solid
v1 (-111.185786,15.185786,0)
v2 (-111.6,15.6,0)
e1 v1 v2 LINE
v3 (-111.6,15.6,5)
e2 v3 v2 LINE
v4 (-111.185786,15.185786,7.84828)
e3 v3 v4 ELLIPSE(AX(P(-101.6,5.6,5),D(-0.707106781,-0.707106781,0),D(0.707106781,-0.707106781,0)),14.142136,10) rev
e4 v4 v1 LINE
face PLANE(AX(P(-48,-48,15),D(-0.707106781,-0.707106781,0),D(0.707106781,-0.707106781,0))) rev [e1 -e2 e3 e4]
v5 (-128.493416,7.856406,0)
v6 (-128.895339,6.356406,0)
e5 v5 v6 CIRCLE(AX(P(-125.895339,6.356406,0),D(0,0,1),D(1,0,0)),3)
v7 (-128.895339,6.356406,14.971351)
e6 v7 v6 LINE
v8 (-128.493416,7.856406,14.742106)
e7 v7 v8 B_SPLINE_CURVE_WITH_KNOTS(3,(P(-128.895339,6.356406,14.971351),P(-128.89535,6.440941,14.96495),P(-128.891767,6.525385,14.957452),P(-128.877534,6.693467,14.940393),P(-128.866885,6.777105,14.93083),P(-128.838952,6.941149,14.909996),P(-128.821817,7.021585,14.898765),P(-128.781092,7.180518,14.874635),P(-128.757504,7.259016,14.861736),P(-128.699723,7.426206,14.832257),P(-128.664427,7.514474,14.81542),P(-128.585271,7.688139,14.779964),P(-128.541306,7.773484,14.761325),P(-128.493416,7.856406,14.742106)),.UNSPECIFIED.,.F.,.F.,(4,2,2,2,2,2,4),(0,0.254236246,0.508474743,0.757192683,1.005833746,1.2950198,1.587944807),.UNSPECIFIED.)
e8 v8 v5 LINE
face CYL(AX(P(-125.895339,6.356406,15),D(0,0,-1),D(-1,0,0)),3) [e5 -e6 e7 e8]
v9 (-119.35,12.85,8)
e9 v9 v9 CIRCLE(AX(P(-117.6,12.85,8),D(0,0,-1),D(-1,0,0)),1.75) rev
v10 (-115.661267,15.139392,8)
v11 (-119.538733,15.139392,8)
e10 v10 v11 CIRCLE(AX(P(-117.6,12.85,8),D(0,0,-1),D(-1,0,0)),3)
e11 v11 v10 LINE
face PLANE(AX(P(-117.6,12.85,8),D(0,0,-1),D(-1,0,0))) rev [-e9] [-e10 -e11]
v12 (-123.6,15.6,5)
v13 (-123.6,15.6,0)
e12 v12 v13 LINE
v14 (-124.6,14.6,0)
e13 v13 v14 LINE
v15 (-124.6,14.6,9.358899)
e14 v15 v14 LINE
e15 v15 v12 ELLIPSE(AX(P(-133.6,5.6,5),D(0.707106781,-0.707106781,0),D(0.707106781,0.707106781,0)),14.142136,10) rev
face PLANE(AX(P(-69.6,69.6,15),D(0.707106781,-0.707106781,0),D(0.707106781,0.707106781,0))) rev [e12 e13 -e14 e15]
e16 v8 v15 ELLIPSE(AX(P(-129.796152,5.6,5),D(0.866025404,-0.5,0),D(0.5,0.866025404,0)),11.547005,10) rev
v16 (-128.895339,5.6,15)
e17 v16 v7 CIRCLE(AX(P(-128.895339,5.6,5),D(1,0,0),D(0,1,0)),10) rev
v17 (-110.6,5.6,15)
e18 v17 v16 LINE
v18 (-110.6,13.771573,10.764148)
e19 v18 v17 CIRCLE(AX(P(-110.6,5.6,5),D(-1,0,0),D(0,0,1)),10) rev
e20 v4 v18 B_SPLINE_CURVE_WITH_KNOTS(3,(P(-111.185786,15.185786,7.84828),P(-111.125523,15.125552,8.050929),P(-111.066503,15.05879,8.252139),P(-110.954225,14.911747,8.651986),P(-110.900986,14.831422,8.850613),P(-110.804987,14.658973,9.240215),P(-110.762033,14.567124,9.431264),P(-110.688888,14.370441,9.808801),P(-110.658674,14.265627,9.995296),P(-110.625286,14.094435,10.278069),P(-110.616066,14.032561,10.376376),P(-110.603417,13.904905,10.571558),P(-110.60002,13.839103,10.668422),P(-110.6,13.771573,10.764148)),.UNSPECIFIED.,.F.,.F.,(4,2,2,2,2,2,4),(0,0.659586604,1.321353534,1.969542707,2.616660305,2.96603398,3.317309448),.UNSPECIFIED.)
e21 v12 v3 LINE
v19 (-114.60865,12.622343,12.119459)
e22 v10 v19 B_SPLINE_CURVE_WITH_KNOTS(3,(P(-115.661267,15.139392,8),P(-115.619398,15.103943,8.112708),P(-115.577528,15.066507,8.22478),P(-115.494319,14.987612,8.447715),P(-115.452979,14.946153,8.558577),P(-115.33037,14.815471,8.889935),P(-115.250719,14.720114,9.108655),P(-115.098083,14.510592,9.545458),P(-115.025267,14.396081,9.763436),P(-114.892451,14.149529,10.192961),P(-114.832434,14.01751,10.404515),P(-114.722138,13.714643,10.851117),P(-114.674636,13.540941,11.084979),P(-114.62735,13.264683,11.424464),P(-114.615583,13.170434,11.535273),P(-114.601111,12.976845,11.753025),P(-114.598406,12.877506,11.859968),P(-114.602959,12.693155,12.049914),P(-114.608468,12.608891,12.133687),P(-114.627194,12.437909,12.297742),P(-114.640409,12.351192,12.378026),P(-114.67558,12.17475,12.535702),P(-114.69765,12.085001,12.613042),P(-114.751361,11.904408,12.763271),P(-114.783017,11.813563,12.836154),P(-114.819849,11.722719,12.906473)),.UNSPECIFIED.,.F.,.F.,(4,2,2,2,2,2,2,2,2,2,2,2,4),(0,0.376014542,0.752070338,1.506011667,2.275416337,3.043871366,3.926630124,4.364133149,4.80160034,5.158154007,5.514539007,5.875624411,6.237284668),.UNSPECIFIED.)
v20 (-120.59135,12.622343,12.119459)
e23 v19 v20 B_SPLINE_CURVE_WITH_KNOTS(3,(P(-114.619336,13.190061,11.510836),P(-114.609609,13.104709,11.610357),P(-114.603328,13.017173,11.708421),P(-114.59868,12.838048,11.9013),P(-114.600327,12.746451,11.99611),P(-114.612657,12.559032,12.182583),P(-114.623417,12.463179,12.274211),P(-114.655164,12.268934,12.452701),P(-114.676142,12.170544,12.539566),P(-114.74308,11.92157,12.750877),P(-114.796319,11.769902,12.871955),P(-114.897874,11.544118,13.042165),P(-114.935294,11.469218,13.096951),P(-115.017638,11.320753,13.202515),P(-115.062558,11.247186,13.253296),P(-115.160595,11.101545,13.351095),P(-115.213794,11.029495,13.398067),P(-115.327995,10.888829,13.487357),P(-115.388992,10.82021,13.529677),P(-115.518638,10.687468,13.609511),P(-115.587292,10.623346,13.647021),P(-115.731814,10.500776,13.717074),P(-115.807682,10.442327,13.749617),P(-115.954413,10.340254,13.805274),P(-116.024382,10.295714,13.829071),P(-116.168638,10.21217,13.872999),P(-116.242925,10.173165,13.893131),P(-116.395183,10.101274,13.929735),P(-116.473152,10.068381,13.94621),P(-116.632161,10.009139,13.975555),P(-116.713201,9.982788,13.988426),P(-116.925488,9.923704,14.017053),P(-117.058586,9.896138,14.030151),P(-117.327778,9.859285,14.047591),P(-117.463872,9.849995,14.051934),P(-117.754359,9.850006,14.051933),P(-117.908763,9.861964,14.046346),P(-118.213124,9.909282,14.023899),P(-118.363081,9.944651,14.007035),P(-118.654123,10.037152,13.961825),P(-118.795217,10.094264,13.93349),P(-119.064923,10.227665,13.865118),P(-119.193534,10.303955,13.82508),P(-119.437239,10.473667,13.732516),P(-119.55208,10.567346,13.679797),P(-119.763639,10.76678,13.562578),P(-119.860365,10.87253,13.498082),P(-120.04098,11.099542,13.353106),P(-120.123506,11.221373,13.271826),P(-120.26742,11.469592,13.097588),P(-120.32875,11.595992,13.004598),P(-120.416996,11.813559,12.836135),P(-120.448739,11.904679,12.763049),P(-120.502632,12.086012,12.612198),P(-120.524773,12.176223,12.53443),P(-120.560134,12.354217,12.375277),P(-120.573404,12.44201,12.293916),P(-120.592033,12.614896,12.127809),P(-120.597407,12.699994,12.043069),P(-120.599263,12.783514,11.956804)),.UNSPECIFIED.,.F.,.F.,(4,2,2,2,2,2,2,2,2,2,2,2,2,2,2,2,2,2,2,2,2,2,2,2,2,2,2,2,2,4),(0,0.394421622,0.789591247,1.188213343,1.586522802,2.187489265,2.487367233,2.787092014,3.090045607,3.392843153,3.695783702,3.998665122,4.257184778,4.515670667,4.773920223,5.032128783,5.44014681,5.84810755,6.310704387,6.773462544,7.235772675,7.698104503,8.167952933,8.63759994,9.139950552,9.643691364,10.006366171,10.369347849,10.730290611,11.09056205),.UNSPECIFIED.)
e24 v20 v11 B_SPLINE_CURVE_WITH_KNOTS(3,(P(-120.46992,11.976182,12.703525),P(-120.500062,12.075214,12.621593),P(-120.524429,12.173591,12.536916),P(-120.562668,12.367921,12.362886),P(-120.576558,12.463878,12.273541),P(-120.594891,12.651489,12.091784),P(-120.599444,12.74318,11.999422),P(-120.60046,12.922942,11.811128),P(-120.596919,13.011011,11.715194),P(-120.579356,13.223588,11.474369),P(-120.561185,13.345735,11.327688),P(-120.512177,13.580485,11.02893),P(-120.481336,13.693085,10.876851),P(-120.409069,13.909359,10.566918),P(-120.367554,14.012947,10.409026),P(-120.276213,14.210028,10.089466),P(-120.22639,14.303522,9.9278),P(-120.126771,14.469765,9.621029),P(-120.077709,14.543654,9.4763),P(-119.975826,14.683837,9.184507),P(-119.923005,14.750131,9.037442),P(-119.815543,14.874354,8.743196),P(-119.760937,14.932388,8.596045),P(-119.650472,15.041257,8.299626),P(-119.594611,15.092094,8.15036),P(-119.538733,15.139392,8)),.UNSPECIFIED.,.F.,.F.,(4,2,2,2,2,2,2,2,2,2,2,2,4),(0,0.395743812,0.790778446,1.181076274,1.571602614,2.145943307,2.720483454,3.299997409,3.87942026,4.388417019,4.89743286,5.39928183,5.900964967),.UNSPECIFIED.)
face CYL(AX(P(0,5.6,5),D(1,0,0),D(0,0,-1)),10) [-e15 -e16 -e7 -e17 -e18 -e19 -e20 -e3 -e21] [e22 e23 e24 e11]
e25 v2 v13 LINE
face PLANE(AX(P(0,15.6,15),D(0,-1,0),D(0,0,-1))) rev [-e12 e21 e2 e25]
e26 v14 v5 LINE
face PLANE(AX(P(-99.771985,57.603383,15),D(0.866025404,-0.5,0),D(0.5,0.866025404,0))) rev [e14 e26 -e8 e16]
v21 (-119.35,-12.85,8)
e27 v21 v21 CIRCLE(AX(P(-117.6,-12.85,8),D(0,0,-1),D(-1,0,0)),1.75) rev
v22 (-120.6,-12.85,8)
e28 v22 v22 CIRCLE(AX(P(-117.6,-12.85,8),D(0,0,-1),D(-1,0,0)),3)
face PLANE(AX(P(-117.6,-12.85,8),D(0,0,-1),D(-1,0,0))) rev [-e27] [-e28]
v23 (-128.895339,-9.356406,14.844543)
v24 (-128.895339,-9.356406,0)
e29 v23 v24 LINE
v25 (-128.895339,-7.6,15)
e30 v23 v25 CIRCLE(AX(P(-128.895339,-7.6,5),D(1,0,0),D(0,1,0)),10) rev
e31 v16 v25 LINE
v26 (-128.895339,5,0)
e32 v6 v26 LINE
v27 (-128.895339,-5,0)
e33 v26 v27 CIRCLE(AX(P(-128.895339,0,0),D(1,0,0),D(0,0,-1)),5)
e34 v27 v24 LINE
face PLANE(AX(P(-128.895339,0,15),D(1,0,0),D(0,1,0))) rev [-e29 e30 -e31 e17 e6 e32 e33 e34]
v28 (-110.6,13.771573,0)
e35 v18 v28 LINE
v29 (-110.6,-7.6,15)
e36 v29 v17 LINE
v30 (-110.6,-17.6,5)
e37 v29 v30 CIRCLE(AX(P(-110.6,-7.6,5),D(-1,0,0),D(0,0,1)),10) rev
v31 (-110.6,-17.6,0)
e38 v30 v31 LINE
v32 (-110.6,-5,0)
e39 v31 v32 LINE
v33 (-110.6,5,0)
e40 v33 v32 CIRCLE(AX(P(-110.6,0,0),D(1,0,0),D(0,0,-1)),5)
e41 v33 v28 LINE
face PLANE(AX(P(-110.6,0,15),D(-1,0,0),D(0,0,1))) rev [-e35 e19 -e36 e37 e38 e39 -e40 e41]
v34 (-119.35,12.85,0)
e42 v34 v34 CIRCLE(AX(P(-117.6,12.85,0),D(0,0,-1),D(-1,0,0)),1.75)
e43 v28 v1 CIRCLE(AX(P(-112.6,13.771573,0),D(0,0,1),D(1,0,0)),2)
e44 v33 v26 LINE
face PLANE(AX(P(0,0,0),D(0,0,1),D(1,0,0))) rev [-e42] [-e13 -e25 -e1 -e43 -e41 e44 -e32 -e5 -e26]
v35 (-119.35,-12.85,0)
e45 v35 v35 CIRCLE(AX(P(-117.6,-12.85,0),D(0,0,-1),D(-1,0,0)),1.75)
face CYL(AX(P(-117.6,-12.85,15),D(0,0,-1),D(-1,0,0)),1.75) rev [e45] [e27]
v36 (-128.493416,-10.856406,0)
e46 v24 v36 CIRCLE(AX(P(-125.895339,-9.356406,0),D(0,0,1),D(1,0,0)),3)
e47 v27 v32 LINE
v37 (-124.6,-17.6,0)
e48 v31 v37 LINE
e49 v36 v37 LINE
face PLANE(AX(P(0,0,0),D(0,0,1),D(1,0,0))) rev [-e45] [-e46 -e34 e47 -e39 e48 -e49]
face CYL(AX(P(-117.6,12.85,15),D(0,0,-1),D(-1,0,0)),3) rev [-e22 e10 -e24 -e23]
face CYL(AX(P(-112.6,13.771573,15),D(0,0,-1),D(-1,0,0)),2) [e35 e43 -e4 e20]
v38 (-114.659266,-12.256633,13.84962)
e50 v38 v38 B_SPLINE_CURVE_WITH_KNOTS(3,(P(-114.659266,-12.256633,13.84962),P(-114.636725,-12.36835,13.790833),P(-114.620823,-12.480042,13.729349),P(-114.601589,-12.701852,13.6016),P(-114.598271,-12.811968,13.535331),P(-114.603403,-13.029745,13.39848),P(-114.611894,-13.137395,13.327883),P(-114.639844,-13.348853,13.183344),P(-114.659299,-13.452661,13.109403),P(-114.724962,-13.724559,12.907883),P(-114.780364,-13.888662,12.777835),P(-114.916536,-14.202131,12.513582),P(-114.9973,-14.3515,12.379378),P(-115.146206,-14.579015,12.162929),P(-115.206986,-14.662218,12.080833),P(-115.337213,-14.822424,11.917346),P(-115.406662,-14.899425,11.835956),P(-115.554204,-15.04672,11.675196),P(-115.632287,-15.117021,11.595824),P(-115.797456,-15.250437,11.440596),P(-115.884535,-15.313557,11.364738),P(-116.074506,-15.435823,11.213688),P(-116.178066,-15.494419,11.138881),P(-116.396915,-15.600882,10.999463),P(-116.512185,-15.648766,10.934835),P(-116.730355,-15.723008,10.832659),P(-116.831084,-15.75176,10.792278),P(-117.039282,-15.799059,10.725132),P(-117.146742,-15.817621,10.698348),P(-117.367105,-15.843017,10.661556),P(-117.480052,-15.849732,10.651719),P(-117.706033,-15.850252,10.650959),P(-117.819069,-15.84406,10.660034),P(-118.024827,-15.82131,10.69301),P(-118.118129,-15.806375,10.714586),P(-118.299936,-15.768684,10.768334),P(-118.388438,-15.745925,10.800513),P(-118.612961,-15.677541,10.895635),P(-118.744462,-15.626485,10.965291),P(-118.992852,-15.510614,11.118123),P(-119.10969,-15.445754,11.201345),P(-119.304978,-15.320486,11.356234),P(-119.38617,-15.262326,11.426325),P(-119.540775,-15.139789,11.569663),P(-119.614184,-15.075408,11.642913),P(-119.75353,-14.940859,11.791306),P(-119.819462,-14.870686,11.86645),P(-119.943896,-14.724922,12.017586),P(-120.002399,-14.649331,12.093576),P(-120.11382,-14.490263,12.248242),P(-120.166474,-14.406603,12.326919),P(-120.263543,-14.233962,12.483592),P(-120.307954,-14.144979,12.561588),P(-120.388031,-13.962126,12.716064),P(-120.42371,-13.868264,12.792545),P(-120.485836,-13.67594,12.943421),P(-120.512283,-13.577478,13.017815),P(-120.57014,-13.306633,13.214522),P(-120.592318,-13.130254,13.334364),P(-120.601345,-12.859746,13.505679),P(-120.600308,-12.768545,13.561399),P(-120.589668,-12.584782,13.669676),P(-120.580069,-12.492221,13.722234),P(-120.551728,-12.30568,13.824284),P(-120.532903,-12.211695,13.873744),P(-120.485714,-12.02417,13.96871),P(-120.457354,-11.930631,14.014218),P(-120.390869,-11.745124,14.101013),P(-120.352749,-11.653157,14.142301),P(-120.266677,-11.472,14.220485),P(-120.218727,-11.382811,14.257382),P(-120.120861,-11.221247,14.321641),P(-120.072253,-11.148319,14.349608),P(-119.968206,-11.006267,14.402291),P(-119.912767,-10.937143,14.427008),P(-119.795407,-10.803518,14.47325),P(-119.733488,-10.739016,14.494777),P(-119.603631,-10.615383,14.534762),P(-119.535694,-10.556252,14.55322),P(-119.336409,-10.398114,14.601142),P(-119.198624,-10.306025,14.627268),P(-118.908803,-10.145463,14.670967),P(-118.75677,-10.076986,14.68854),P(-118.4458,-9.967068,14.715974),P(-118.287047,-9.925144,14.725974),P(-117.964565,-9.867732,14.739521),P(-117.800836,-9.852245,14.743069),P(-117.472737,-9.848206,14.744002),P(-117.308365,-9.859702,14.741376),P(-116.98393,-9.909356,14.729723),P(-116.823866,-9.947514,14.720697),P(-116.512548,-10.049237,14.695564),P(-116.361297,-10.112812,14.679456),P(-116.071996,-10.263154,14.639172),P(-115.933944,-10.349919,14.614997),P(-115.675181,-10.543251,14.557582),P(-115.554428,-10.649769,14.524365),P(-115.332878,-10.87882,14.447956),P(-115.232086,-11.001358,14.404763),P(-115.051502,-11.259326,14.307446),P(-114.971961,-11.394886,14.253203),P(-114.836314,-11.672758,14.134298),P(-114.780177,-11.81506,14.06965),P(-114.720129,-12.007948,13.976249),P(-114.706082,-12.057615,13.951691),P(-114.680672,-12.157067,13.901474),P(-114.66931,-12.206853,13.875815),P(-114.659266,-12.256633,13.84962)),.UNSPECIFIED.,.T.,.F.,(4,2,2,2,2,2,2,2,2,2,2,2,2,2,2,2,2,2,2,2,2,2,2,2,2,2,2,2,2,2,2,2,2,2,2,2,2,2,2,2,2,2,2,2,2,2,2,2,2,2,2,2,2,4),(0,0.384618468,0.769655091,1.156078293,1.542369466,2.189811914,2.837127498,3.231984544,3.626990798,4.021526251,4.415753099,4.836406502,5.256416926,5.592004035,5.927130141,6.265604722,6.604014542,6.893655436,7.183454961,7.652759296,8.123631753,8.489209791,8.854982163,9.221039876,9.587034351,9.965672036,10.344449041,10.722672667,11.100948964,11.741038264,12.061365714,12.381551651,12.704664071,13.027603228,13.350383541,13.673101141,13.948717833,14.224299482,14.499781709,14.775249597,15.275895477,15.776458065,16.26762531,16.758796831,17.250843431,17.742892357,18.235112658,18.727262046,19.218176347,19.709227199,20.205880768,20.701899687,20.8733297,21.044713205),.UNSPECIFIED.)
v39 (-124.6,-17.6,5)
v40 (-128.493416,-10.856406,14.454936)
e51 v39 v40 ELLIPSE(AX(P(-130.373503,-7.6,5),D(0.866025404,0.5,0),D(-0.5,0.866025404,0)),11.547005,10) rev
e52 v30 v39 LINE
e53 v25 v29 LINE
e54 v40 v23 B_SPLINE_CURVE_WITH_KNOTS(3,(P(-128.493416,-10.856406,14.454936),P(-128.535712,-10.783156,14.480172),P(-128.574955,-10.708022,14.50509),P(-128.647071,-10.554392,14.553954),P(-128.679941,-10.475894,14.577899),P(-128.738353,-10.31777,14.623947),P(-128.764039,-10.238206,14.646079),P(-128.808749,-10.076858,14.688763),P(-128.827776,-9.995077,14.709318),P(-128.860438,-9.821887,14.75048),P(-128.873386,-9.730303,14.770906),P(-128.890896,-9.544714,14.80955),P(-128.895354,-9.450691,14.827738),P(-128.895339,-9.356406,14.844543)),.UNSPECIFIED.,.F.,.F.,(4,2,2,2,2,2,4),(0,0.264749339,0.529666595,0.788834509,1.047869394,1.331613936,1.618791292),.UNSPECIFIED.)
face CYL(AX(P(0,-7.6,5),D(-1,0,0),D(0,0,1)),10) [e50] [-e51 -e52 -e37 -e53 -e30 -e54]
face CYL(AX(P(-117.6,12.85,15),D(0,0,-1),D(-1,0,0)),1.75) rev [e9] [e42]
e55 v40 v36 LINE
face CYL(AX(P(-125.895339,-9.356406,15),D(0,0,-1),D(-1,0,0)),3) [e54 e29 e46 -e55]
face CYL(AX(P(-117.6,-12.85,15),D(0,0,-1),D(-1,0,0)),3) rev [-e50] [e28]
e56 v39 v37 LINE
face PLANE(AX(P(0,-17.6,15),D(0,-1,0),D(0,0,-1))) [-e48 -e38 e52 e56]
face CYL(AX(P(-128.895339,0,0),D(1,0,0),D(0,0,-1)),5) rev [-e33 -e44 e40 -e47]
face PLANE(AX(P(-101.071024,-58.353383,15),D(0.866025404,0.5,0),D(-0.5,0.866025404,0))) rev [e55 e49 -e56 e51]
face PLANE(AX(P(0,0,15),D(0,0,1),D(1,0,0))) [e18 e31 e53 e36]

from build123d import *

# Parameters (mm, degrees)
BOSS_EXTRUDE1_DEPTH = 15
SKETCH3_R           = 5
CUT_EXTRUDE1_DEPTH  = 30.486936791
SKETCH5_R           = 1.75
CUT_EXTRUDE3_DEPTH  = 131.953306572
CUT_EXTRUDE4_START  = -8
SKETCH6_R           = 3
CUT_EXTRUDE4_DEPTH  = 123.953306572
FILLET1_START       = -130
FILLET1_DEPTH       = 19.4


with BuildPart() as part:
    # Sketch1 → Boss-Extrude1 (new body)
    with BuildSketch(Plane.XY):
        with BuildLine():
            Line((-124.6, 14.6), (-128.493415545, 7.856406461))
            ThreePointArc((-128.493415545, 7.856406461), (-128.793116813, 7.132863596), (-128.895339334, 6.356406461))
            Line((-128.895339334, 6.356406461), (-128.895339334, -9.356406461))
            ThreePointArc((-128.895339334, -9.356406461), (-128.793116813, -10.132863596), (-128.493415545, -10.856406461))
            Line((-128.493415545, -10.856406461), (-124.6, -17.6))
            Line((-124.6, -17.6), (-110.6, -17.6))
            Line((-110.6, -17.6), (-110.6, -5))
            Line((-110.6, -5), (-110.6, 5))
            Line((-110.6, 5), (-110.6, 13.771572875))
            ThreePointArc((-110.6, 13.771572875), (-110.752240935, 14.53693974), (-111.185786438, 15.185786438))
            Line((-111.185786438, 15.185786438), (-111.6, 15.6))
            Line((-111.6, 15.6), (-123.6, 15.6))
            Line((-123.6, 15.6), (-124.6, 14.6))
        make_face()
    extrude(amount=BOSS_EXTRUDE1_DEPTH)

    # Sketch3 → Cut-Extrude1 (cut, through all)
    with BuildSketch(Plane(origin=(-110.6, 0, 0), x_dir=(0, 0, -1), z_dir=(1, 0, 0))):
        Circle(SKETCH3_R)
    extrude(amount=-CUT_EXTRUDE1_DEPTH, mode=Mode.SUBTRACT)

    # Sketch5 → Cut-Extrude3 (cut, through all)
    with BuildSketch(Plane(origin=(0, 0, 0), x_dir=(-1, 0, 0), z_dir=(0, 0, -1))):
        with Locations((117.6, 12.85)):
            Circle(SKETCH5_R)
        with Locations((117.6, -12.85)):
            Circle(SKETCH5_R)
    extrude(amount=-CUT_EXTRUDE3_DEPTH, mode=Mode.SUBTRACT)

    # Sketch6 → Cut-Extrude4 (cut, through all)
    with BuildSketch(Plane(origin=(0, 0, 0), x_dir=(-1, 0, 0), z_dir=(0, 0, -1)).offset(CUT_EXTRUDE4_START)):
        with Locations((117.6, 12.85)):
            Circle(SKETCH6_R)
        with Locations((117.6, -12.85)):
            Circle(SKETCH6_R)
    extrude(amount=-CUT_EXTRUDE4_DEPTH, mode=Mode.SUBTRACT)

    # Fillet1: read off the stored shape, not the designer's step
    # Fillet1 outline → Fillet1 (cut)
    with BuildSketch(Plane.YZ.offset(FILLET1_START)):
        with BuildLine():
            ThreePointArc((-17.6, 5), (-14.671067812, 12.071067812), (-7.6, 15))
            Line((-7.6, 15), (-17.6, 15))
            Line((-17.6, 15), (-17.6, 5))
        make_face()
        with BuildLine():
            ThreePointArc((5.6, 15), (12.671067812, 12.071067812), (15.6, 5))
            Line((15.6, 5), (15.6, 15))
            Line((15.6, 15), (5.6, 15))
        make_face()
    extrude(amount=FILLET1_DEPTH, mode=Mode.SUBTRACT)


solid = part.part
